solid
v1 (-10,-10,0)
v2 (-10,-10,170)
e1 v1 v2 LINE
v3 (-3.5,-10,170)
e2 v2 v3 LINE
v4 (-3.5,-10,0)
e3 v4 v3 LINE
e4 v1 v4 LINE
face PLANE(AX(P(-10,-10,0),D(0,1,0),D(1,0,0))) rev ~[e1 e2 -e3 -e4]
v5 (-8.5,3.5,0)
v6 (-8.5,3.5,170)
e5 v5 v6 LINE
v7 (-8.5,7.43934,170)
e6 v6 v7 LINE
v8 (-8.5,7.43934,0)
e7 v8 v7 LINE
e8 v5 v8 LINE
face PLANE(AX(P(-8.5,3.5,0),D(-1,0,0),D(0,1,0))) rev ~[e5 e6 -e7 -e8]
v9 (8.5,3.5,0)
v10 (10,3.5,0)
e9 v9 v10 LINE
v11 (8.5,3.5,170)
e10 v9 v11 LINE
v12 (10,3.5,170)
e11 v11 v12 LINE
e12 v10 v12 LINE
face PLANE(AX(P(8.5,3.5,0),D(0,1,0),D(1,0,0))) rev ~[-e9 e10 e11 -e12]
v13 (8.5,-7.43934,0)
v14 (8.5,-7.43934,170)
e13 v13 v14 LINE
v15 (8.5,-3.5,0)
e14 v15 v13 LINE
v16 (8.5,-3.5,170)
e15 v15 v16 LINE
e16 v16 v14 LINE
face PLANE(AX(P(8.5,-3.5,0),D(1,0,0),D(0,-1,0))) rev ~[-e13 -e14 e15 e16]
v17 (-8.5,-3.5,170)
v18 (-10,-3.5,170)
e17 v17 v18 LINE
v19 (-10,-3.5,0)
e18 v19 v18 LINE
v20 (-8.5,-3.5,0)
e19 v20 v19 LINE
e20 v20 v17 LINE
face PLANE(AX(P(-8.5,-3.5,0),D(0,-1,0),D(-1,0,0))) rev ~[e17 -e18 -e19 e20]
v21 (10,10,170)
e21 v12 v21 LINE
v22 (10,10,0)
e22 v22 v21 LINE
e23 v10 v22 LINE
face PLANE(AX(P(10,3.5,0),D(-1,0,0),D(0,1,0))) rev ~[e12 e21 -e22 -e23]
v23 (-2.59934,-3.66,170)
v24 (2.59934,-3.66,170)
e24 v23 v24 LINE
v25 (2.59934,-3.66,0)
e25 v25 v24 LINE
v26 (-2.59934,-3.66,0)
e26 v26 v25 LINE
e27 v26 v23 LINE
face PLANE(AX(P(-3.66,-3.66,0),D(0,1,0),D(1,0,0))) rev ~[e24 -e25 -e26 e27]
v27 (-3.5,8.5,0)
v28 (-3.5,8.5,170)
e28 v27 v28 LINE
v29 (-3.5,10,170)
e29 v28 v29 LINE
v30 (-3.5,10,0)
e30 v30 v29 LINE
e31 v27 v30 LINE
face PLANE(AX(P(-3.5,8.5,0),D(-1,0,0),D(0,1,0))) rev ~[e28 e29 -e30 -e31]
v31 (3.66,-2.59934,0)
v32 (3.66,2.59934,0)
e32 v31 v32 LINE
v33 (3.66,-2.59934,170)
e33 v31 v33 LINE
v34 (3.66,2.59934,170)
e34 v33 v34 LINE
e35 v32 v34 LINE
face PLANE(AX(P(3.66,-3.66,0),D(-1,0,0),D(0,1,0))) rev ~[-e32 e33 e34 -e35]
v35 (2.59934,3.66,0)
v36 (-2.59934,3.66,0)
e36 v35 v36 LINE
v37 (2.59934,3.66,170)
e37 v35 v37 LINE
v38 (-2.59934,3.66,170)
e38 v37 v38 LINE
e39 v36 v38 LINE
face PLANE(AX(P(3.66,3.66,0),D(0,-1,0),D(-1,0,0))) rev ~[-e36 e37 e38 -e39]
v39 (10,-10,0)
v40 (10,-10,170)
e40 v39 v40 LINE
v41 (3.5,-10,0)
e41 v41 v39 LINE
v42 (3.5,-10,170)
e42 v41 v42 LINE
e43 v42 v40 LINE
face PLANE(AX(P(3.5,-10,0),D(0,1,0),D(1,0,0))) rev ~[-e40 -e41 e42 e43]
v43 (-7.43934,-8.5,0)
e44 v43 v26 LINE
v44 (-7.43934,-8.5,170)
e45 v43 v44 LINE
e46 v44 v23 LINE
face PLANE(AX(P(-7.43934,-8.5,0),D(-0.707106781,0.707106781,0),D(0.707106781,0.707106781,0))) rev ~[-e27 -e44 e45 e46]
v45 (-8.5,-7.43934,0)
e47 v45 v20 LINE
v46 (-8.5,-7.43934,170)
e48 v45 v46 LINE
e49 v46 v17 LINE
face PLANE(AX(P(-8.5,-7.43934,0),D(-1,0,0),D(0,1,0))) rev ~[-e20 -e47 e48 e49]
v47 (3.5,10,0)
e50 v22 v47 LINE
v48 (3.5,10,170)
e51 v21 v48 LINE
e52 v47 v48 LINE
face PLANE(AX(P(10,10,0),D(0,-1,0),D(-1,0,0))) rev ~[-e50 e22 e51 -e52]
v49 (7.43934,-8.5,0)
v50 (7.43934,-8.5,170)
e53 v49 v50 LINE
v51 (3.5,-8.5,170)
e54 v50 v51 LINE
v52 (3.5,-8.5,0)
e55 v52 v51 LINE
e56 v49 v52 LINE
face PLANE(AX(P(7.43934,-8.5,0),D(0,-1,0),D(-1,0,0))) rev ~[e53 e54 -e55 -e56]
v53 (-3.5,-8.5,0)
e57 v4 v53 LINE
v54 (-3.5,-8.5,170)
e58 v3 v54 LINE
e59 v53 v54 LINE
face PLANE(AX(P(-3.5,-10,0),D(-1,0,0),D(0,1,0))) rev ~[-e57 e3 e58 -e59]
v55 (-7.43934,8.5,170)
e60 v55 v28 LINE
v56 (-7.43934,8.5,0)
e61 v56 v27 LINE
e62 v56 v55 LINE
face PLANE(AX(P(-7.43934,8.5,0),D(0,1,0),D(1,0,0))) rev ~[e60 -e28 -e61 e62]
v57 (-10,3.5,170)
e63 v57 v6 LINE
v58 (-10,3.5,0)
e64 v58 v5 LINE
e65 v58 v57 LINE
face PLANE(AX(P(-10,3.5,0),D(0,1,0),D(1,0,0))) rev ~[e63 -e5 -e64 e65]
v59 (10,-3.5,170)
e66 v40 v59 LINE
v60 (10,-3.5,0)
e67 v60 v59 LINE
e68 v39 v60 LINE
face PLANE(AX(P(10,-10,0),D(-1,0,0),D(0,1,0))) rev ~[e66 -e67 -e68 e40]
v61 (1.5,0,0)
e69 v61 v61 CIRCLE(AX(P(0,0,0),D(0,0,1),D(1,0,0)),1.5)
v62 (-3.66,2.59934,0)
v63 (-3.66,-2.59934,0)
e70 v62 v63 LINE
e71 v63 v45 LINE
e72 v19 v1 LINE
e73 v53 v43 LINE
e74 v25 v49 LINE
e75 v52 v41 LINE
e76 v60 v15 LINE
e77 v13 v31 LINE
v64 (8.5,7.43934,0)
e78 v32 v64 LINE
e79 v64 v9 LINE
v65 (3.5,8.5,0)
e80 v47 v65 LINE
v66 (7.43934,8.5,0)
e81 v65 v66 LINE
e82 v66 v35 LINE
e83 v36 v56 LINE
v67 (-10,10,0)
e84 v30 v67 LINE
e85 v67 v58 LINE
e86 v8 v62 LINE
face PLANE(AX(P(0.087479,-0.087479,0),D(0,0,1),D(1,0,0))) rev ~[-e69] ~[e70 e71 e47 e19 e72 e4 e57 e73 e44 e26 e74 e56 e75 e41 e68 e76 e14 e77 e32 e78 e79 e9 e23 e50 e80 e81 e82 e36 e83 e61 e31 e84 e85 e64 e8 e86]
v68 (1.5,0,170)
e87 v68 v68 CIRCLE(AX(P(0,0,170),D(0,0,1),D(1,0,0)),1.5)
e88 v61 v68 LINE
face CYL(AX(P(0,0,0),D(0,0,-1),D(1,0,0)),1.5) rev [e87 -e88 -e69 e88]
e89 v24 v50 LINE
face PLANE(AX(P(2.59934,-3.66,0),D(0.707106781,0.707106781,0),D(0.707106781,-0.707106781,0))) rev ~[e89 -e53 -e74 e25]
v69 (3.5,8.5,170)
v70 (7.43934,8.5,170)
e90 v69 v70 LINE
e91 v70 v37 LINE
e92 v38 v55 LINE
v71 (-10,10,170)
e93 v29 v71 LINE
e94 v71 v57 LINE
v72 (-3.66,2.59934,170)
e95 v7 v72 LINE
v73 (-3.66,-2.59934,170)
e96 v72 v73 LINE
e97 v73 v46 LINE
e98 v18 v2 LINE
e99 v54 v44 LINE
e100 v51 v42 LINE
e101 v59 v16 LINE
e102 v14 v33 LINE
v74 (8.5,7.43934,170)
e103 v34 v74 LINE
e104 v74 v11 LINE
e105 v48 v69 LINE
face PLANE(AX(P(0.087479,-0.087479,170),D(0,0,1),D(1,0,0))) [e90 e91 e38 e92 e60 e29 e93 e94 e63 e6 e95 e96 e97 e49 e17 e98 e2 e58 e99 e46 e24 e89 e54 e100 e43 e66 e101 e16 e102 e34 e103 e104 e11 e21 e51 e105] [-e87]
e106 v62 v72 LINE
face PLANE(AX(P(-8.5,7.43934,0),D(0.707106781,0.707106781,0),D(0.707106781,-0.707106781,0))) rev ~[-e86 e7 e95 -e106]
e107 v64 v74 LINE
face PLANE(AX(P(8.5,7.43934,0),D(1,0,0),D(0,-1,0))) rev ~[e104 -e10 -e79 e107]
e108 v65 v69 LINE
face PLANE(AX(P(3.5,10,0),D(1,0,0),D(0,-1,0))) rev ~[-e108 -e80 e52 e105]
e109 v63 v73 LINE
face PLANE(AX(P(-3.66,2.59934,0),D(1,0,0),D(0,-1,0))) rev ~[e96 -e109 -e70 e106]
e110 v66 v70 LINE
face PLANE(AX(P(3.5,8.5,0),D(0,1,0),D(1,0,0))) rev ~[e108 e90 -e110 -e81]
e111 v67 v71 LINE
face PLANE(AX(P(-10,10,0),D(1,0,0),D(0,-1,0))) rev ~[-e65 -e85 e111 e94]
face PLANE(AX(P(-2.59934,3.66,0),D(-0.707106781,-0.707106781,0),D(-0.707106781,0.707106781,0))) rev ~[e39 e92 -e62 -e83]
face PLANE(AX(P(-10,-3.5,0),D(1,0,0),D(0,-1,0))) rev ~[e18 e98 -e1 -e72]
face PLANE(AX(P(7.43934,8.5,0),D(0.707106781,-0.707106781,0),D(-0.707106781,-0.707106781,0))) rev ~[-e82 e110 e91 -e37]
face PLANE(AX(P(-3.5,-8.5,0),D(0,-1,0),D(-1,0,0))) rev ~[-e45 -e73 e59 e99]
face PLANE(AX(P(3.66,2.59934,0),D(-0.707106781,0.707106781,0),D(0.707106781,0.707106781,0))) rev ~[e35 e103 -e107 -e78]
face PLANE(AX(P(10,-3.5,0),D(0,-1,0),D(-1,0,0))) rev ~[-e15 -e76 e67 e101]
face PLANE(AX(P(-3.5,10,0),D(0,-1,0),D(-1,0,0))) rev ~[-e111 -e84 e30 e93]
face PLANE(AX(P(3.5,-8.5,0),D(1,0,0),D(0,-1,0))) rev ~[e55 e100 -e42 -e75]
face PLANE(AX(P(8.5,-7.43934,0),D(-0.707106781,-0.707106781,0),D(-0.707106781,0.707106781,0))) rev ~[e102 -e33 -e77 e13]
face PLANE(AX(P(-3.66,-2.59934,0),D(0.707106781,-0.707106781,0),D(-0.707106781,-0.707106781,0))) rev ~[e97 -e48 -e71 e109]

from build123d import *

# Parameters (mm, degrees)
F0_R            = 1.5
F1_DEPTH        = 170
F1_COPIES_COUNT = 4


# Not quite as in the source:
# - a pattern or mirror of a feature is missing from the dataset's text; its kind, count and spacing are read off the source's solid
# - a feature names something its author has since deleted; it is built from what else it names


with BuildPart() as f1:
    # F0 (on Top) → F1 (new body)
    with BuildSketch(Plane.XY):
        Polygon((-3.66, -3.66), (3.66, -3.66), (3.66, 3.66), (-2.5993398282, 3.66), (-3.66, 2.5993398282), align=None)
        Circle(F0_R, mode=Mode.SUBTRACT)
        Polygon((-8.5, 7.4393398282), (-3.66, 2.5993398282), (-2.5993398282, 3.66), (-7.4393398282, 8.5), (-3.5, 8.5), (-3.5, 10), (-10, 10), (-10, 3.5), (-8.5, 3.5), align=None)
    extrude(amount=F1_DEPTH)

    # F1_copies: F1 ×4 about axis
    f1_copies_axis = Axis((0, 0, 0), (0, 0, 1))


with BuildPart() as f1_1:
    add(f1.part)
    for i in range(1, F1_COPIES_COUNT):
        add(f1.part.rotate(f1_copies_axis, i * 360 / F1_COPIES_COUNT))


solid = f1_1.part
